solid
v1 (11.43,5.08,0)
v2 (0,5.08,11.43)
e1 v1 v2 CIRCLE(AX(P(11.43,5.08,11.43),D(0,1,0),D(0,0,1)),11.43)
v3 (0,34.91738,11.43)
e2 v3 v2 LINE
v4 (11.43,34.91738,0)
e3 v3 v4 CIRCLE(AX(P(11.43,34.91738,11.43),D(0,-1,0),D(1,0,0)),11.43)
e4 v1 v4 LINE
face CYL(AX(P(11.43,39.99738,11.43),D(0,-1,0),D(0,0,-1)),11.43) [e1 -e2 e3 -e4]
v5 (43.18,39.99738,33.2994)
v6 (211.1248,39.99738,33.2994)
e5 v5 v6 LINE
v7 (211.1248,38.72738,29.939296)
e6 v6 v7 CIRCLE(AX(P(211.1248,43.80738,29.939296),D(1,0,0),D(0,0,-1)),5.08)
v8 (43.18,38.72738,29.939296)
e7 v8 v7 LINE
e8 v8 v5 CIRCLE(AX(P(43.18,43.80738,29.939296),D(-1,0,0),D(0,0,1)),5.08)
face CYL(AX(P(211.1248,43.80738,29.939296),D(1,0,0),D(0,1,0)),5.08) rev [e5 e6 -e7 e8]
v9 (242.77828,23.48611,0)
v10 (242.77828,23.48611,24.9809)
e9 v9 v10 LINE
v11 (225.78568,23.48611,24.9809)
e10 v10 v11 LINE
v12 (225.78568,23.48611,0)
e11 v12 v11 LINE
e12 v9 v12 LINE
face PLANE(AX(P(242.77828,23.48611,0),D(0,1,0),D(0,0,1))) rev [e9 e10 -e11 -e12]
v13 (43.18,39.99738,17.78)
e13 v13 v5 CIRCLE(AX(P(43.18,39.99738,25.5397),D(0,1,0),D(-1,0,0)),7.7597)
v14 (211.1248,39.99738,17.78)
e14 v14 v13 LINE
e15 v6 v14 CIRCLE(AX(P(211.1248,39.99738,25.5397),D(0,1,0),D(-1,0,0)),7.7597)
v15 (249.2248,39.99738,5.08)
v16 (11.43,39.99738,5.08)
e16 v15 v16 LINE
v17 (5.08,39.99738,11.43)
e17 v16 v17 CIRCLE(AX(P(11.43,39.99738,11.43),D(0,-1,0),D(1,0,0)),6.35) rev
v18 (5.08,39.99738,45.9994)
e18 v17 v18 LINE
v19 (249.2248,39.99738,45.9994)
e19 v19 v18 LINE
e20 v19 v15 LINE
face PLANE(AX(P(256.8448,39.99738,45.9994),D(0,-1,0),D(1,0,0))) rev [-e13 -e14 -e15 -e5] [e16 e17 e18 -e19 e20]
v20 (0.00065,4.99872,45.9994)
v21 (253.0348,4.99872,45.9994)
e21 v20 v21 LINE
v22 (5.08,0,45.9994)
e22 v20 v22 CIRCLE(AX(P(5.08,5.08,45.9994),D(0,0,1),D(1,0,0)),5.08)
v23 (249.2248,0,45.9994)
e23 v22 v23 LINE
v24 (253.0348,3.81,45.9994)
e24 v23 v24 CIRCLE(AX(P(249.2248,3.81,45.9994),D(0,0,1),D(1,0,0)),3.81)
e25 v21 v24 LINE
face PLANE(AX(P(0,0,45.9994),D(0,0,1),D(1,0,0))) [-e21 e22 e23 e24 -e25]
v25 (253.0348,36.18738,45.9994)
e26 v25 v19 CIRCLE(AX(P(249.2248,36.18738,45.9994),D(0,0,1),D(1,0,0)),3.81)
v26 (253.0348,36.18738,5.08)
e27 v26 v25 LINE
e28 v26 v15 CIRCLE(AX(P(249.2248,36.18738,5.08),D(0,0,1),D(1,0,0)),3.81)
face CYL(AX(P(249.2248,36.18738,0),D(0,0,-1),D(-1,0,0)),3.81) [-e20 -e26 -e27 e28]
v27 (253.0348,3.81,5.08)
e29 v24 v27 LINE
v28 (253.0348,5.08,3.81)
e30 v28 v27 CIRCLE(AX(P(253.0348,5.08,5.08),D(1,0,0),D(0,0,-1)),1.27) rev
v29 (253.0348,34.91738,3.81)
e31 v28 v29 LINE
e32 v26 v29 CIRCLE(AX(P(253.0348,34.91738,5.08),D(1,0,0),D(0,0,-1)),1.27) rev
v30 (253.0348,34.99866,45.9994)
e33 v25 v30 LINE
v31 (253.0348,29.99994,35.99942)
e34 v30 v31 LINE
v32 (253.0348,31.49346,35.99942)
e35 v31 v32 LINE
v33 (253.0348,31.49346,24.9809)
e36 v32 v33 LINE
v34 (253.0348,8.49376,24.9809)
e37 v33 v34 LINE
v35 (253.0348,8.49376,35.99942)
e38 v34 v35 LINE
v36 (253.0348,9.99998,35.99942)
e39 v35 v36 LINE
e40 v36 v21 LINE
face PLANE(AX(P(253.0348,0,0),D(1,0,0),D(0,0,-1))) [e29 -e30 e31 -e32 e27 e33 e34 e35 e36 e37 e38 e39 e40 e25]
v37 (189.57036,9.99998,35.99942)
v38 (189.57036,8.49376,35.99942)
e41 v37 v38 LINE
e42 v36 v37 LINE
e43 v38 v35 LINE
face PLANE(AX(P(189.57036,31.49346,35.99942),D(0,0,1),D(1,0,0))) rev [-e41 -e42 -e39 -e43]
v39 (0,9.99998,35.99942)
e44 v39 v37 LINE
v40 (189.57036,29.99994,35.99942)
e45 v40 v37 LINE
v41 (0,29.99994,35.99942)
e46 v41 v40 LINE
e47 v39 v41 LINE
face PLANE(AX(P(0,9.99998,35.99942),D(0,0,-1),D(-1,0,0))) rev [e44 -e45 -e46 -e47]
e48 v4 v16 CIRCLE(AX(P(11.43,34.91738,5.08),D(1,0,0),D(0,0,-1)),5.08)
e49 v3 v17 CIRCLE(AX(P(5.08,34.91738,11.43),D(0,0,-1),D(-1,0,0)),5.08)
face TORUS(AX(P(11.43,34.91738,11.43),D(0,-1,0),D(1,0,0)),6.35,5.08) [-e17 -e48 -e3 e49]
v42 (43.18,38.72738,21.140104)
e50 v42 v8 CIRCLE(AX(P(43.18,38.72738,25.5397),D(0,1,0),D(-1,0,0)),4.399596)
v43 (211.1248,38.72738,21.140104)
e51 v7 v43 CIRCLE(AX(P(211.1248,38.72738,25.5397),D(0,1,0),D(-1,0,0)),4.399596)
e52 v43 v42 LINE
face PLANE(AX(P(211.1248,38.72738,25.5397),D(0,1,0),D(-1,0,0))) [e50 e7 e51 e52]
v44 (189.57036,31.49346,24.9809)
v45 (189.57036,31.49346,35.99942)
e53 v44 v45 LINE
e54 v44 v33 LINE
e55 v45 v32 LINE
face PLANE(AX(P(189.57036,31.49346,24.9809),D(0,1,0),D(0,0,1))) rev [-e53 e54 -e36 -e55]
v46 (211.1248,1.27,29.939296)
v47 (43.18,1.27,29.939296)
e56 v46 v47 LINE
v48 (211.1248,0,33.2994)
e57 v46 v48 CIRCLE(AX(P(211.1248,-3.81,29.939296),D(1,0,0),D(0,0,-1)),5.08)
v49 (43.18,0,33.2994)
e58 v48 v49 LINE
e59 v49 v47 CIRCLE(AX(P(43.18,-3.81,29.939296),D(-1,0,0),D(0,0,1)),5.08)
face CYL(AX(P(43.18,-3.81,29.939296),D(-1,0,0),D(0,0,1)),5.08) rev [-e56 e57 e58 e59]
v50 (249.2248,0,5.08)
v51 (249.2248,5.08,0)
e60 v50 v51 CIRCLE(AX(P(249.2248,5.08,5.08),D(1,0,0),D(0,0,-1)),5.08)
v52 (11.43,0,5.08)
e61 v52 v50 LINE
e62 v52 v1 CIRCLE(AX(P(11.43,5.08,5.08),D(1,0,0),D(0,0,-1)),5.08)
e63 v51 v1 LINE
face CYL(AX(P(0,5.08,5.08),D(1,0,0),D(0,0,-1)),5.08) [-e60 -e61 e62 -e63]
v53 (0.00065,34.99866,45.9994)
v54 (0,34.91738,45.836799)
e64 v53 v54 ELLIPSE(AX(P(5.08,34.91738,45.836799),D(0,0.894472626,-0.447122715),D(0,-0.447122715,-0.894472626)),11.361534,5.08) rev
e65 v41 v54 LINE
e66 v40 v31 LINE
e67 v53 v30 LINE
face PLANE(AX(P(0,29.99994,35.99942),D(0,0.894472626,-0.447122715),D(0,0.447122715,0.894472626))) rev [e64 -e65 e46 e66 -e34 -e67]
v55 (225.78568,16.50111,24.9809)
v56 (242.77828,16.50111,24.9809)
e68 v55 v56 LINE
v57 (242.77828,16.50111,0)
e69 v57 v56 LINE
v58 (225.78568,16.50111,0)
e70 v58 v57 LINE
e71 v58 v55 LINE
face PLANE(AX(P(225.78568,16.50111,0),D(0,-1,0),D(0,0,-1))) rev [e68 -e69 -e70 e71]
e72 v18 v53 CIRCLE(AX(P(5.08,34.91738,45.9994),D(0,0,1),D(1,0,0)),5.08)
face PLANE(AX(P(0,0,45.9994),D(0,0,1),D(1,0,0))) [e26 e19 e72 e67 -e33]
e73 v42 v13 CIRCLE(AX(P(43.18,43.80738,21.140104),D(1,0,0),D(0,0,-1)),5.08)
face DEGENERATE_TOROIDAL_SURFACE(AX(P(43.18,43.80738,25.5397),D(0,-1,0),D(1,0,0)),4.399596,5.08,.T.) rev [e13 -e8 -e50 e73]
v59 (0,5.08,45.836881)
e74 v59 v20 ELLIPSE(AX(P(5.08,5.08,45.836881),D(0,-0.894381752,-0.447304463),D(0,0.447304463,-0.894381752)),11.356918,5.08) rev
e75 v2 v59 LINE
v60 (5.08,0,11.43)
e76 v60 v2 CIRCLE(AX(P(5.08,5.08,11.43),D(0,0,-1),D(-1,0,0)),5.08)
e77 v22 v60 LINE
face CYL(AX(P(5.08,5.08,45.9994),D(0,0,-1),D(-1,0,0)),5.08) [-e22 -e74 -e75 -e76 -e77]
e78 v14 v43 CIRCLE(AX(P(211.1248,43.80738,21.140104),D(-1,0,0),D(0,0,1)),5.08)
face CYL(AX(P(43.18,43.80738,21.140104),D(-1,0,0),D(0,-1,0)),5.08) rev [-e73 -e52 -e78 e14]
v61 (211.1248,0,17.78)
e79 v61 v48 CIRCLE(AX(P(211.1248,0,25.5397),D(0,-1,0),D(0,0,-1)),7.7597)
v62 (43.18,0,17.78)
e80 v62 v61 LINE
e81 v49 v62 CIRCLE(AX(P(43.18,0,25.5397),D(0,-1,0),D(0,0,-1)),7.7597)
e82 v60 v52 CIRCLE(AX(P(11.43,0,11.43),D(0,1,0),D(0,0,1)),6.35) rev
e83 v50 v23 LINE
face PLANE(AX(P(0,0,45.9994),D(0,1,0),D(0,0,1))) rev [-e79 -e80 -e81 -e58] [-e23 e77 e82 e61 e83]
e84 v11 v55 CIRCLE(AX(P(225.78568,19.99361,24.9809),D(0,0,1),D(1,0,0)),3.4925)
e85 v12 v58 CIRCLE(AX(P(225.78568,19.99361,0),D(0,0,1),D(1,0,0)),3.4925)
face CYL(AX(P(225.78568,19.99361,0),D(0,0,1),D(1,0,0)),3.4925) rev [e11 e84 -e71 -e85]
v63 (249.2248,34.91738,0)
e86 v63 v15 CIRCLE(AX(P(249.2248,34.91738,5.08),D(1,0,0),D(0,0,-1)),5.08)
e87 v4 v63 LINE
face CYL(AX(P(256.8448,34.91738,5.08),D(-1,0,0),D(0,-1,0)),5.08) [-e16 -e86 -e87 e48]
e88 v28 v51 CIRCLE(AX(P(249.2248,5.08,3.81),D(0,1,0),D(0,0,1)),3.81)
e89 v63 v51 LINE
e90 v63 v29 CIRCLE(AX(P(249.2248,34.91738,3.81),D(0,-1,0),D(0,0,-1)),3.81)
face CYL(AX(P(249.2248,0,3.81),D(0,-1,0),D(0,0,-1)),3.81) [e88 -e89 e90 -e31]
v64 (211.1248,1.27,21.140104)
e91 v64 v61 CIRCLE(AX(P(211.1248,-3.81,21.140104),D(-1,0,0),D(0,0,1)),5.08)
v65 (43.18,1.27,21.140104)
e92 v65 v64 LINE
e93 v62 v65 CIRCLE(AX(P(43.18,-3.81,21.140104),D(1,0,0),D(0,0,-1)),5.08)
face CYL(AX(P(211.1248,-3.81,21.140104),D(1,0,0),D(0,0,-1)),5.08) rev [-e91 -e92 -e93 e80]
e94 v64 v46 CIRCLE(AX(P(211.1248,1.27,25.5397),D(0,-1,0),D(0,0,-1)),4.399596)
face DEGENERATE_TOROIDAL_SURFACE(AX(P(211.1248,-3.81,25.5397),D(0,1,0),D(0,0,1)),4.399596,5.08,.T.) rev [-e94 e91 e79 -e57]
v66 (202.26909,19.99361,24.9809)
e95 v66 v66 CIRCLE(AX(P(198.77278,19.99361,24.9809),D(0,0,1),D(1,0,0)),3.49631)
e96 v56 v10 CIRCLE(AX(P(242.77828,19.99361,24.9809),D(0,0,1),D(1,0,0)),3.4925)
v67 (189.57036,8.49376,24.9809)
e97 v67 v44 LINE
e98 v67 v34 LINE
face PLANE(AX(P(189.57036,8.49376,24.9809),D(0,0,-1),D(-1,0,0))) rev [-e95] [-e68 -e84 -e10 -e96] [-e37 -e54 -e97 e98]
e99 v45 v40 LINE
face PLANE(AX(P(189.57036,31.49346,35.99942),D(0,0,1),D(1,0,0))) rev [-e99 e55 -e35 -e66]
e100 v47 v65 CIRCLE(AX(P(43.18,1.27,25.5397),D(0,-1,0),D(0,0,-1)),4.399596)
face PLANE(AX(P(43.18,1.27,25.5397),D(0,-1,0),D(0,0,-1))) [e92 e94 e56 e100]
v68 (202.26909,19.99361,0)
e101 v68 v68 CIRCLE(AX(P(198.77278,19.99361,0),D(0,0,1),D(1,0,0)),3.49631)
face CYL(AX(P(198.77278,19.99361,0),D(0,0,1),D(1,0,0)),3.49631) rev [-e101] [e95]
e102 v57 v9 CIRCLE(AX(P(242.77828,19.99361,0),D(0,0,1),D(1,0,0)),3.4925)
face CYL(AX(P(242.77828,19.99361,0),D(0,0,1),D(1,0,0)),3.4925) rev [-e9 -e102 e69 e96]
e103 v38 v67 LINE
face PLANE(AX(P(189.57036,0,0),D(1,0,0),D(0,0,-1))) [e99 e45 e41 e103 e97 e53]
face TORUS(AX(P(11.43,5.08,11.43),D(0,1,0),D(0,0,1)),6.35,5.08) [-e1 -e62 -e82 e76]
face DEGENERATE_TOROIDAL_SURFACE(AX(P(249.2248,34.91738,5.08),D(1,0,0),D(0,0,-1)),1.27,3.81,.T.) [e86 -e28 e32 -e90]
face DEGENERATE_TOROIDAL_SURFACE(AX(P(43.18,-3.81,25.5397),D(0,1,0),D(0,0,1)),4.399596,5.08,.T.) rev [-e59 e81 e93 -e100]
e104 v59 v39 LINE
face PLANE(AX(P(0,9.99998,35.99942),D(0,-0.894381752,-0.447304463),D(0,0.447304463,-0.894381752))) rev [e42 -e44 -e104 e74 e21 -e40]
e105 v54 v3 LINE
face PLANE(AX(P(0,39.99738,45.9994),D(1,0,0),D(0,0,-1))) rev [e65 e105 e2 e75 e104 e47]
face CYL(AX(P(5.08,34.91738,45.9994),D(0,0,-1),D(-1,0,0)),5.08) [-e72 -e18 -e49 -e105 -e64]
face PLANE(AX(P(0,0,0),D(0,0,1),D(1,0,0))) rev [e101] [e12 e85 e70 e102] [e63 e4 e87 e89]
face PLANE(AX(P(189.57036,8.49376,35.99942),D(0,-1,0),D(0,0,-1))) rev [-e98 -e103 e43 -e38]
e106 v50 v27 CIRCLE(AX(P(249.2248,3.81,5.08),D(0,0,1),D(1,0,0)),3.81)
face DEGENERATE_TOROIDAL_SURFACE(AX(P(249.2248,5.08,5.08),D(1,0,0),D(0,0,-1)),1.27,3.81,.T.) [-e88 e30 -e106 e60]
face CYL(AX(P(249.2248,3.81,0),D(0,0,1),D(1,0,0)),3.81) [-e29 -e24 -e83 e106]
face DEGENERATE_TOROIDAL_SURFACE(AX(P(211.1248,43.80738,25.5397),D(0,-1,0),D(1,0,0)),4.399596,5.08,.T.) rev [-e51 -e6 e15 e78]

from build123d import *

# Parameters (mm, degrees)
SKETCH1_W           = 256.8448
SKETCH1_H           = 39.99738
BOSS_EXTRUDE1_DEPTH = 45.9994
CUT_EXTRUDE1_DEPTH  = 264.979140264
SKETCH3_W           = 11.01852
SKETCH3_H           = 22.9997
CUT_EXTRUDE2_DEPTH  = 67.27444
SKETCH4_R           = 3.49631
CUT_EXTRUDE3_DEPTH  = 262.138061298
CUT_EXTRUDE4_DEPTH  = 262.138061298
SKETCH6_W           = 45.9994
SKETCH6_H           = 39.99738
CUT_EXTRUDE5_DEPTH  = 3.81
FILLET1_R           = 3.81
FILLET2_R           = 11.43
FILLET3_R           = 5.08
CUT_EXTRUDE6_DEPTH  = 1.27
FILLET4_R           = 5.08
CUT_EXTRUDE7_DEPTH  = 1.27
FILLET5_R           = 5.08


with BuildPart() as part:
    # Sketch1 → Boss-Extrude1 (new body)
    with BuildSketch(Plane.XY):
        with Locations((128.4224, 19.99869)):
            Rectangle(SKETCH1_W, SKETCH1_H)
    extrude(amount=BOSS_EXTRUDE1_DEPTH)

    # Sketch2 → Cut-Extrude1 (cut, through all)
    with BuildSketch(Plane(origin=(256.8448, 0, 0), x_dir=(0, 0, -1), z_dir=(1, 0, 0))):
        Polygon((-35.99942, 9.99998), (-45.9994, 4.99872), (-45.9994, 34.99866), (-35.99942, 29.99994), align=None)
    extrude(amount=-CUT_EXTRUDE1_DEPTH, mode=Mode.SUBTRACT)

    # Sketch3 → Cut-Extrude2 (cut)
    with BuildSketch(Plane(origin=(256.8448, 0, 0), x_dir=(0, 0, -1), z_dir=(1, 0, 0))):
        with Locations((-30.49016, 19.99361)):
            Rectangle(SKETCH3_W, SKETCH3_H)
    extrude(amount=-CUT_EXTRUDE2_DEPTH, mode=Mode.SUBTRACT)

    # Sketch4 → Cut-Extrude3 (cut, through all)
    with BuildSketch(Plane.XY.offset(24.9809)):
        with Locations((198.77278, 19.99361)):
            Circle(SKETCH4_R)
    extrude(amount=-CUT_EXTRUDE3_DEPTH, mode=Mode.SUBTRACT)

    # Sketch5 → Cut-Extrude4 (cut, through all)
    with BuildSketch(Plane.XY.offset(24.9809)):
        with BuildLine():
            Line((242.77828, 23.48611), (225.78568, 23.48611))
            ThreePointArc((225.78568, 23.48611), (222.29318, 19.99361), (225.78568, 16.50111))
            Line((225.78568, 16.50111), (242.77828, 16.50111))
            ThreePointArc((242.77828, 16.50111), (246.27078, 19.99361), (242.77828, 23.48611))
        make_face()
    extrude(amount=-CUT_EXTRUDE4_DEPTH, mode=Mode.SUBTRACT)

    # Sketch6 → Cut-Extrude5 (cut)
    with BuildSketch(Plane(origin=(256.8448, 0, 0), x_dir=(0, 0, -1), z_dir=(1, 0, 0))):
        with Locations((-22.9997, 19.99869)):
            Rectangle(SKETCH6_W, SKETCH6_H)
    extrude(amount=-CUT_EXTRUDE5_DEPTH, mode=Mode.SUBTRACT)

    # Fillet1
    fillet1_edges = [part.edges().sort_by_distance(p)[0] for p in [
        (253.0348, 19.99869, 0),
        (253.0348, 0, 22.9997),
        (253.0348, 39.99738, 22.9997),
    ]]
    fillet(fillet1_edges, radius=FILLET1_R)

    # Fillet2
    fillet2_edges = [part.edges().sort_by_distance(p)[0] for p in [
        (0, 19.99869, 0),
    ]]
    fillet(fillet2_edges, radius=FILLET2_R)

    # Fillet3
    # the kernel refuses this fillet: 5.08 mm, written as the material it takes off along each edge
    with BuildSketch(Plane(origin=(253.0348, 34.91738, 5.08), x_dir=(0, 0, -1), z_dir=(0, -1, 0))) as fillet3_piece_1:
        with BuildLine():
            CenterArc((1.27, -3.81), 3.81, 0, 90)
            Line((5.08, -3.81), (5.08, 0))
            Line((5.08, 0), (1.27, 0))
        make_face()
    revolve(axis=Axis((253.0348, 34.91738, 5.08), (1, 0, 0)), revolution_arc=90, mode=Mode.SUBTRACT)
    with BuildSketch(Plane(origin=(253.0348, 5.08, 5.08), x_dir=(0, -1, 0), z_dir=(0, 0, 1))) as fillet3_piece_2:
        with BuildLine():
            CenterArc((1.27, -3.81), 3.81, 0, 90)
            Line((5.08, -3.81), (5.08, 0))
            Line((5.08, 0), (1.27, 0))
        make_face()
    revolve(axis=Axis((253.0348, 5.08, 5.08), (1, 0, 0)), revolution_arc=90, mode=Mode.SUBTRACT)
    with BuildSketch(Plane(origin=(0, 0, 11.43), x_dir=(1, 0, 0), z_dir=(0, 0, 1)), Plane(origin=(0, 39.99738, 11.43), x_dir=(0, -1, 0), z_dir=(0, 0, 1))) as fillet3_piece_3:
        with BuildLine():
            CenterArc((FILLET3_R, FILLET3_R), FILLET3_R, 180, 90)
            Line((0, FILLET3_R), (0, 0))
            Line((0, 0), (FILLET3_R, 0))
        make_face()
    extrude(amount=47.2694, mode=Mode.SUBTRACT)
    with BuildSketch(Plane(origin=(11.43, 0, 11.43), x_dir=(0, 0, -1), z_dir=(1, 0, 0))) as fillet3_piece_4:
        with BuildLine():
            CenterArc((11.43 - FILLET3_R, FILLET3_R), FILLET3_R, 270, 90)
            Line((11.43, FILLET3_R), (11.43, 0))
            Line((11.43, 0), (11.43 - FILLET3_R, 0))
        make_face()
    revolve(axis=Axis((11.43, 0, 11.43), (0, 1, 0)), revolution_arc=90, mode=Mode.SUBTRACT)
    with BuildSketch(Plane(origin=(11.43, 39.99738, 11.43), x_dir=(0, 0, -1), z_dir=(1, 0, 0))) as fillet3_piece_5:
        with BuildLine():
            CenterArc((11.43 - FILLET3_R, -FILLET3_R), FILLET3_R, 0, 90)
            Line((11.43 - FILLET3_R, 0), (11.43, 0))
            Line((11.43, 0), (11.43, -FILLET3_R))
        make_face()
    revolve(axis=Axis((11.43, 39.99738, 11.43), (0, 1, 0)), revolution_arc=90, mode=Mode.SUBTRACT)
    with BuildSketch(Plane(origin=(11.43, 0, 0), x_dir=(0, 0, 1), z_dir=(1, 0, 0))) as fillet3_piece_6:
        with BuildLine():
            CenterArc((FILLET3_R, -FILLET3_R), FILLET3_R, 90, 90)
            Line((0, -FILLET3_R), (0, 0))
            Line((0, 0), (FILLET3_R, 0))
        make_face()
    extrude(amount=241.6048, mode=Mode.SUBTRACT)
    with BuildSketch(Plane(origin=(253.0348, 39.99738, 0), x_dir=(0, -1, 0), z_dir=(-1, 0, 0))) as fillet3_piece_7:
        with BuildLine():
            CenterArc((FILLET3_R, FILLET3_R), FILLET3_R, 180, 90)
            Line((0, FILLET3_R), (0, 0))
            Line((0, 0), (FILLET3_R, 0))
        make_face()
    extrude(amount=241.6048, mode=Mode.SUBTRACT)

    # Sketch7 → Cut-Extrude6 (cut)
    with BuildSketch(Plane(origin=(0, 39.99738, 0), x_dir=(1, 0, 0), z_dir=(0, 1, 0))):
        with BuildLine():
            Line((211.1248, -33.2994), (43.18, -33.2994))
            ThreePointArc((43.18, -33.2994), (35.4203, -25.5397), (43.18, -17.78))
            Line((43.18, -17.78), (211.1248, -17.78))
            ThreePointArc((211.1248, -17.78), (218.8845, -25.5397), (211.1248, -33.2994))
        make_face()
    extrude(amount=-CUT_EXTRUDE6_DEPTH, mode=Mode.SUBTRACT)

    # Fillet4
    # the kernel refuses this fillet: 5.08 mm, written as the material it adds along each edge
    with BuildSketch(Plane(origin=(211.1248, 38.72738, 33.2994), x_dir=(0, 1, 0), z_dir=(-1, 0, 0)), Plane(origin=(43.18, 38.72738, 17.78), x_dir=(0, 1, 0), z_dir=(1, 0, 0))) as fillet4_piece_1:
        with BuildLine():
            CenterArc((5.08, 3.360104165), FILLET4_R, 180, 41.409622109)
            Line((0, 3.360104165), (-0.1016, 3.360104165))
            Line((-0.1016, 3.360104165), (-0.1016, 0))
            Line((-0.1016, 0), (0, -0.1016))
            ThreePointArc((0, -0.1016), (0.635, -0.1016), (1.1938, -0.067202083))
            Line((1.1938, -0.067202083), (1.27, 0))
        make_face()
    extrude(amount=167.9448)
    with BuildSketch(Plane(origin=(43.18, 38.72738, 25.5397), x_dir=(0, 0, 1), z_dir=(1, 0, 0))) as fillet4_piece_2:
        with BuildLine():
            CenterArc((4.399595835, -5.08), FILLET4_R, 48.590377891, 41.409622109)
            Line((4.399595835, 0), (4.399595835, 0.1016))
            Line((4.399595835, 0.1016), (7.7597, 0.1016))
            Line((7.7597, 0.1016), (7.8613, 0))
            ThreePointArc((7.8613, 0), (7.8613, -0.635), (7.826902083, -1.1938))
            Line((7.826902083, -1.1938), (7.7597, -1.27))
        make_face()
    revolve(axis=Axis((43.18, 38.72738, 25.5397), (0, -1, 0)), revolution_arc=180)
    with BuildSketch(Plane(origin=(211.1248, 38.72738, 25.5397), x_dir=(0, 0, -1), z_dir=(-1, 0, 0))) as fillet4_piece_3:
        with BuildLine():
            CenterArc((4.399595835, -5.08), FILLET4_R, 48.590377891, 41.409622109)
            Line((4.399595835, 0), (4.399595835, 0.1016))
            Line((4.399595835, 0.1016), (7.7597, 0.1016))
            Line((7.7597, 0.1016), (7.8613, 0))
            ThreePointArc((7.8613, 0), (7.8613, -0.635), (7.826902083, -1.1938))
            Line((7.826902083, -1.1938), (7.7597, -1.27))
        make_face()
    revolve(axis=Axis((211.1248, 38.72738, 25.5397), (0, -1, 0)), revolution_arc=180)

    # Sketch8 → Cut-Extrude7 (cut)
    with BuildSketch(Plane.XZ):
        with BuildLine():
            Line((43.18, 33.2994), (211.1248, 33.2994))
            ThreePointArc((211.1248, 33.2994), (218.8845, 25.5397), (211.1248, 17.78))
            Line((211.1248, 17.78), (43.18, 17.78))
            ThreePointArc((43.18, 17.78), (35.4203, 25.5397), (43.18, 33.2994))
        make_face()
    extrude(amount=-CUT_EXTRUDE7_DEPTH, mode=Mode.SUBTRACT)

    # Fillet5
    # the kernel refuses this fillet: 5.08 mm, written as the material it adds along each edge
    with BuildSketch(Plane(origin=(43.18, 1.27, 33.2994), x_dir=(0, -1, 0), z_dir=(1, 0, 0)), Plane(origin=(211.1248, 1.27, 17.78), x_dir=(0, -1, 0), z_dir=(-1, 0, 0))) as fillet5_piece_1:
        with BuildLine():
            CenterArc((5.08, 3.360104165), FILLET5_R, 180, 41.409622109)
            Line((0, 3.360104165), (-0.1016, 3.360104165))
            Line((-0.1016, 3.360104165), (-0.1016, 0))
            Line((-0.1016, 0), (0, -0.1016))
            ThreePointArc((0, -0.1016), (0.635, -0.1016), (1.1938, -0.067202083))
            Line((1.1938, -0.067202083), (1.27, 0))
        make_face()
    extrude(amount=167.9448)
    with BuildSketch(Plane(origin=(211.1248, 1.27, 25.5397), x_dir=(0, 0, 1), z_dir=(-1, 0, 0))) as fillet5_piece_2:
        with BuildLine():
            CenterArc((4.399595835, -5.08), FILLET5_R, 48.590377891, 41.409622109)
            Line((4.399595835, 0), (4.399595835, 0.1016))
            Line((4.399595835, 0.1016), (7.7597, 0.1016))
            Line((7.7597, 0.1016), (7.8613, 0))
            ThreePointArc((7.8613, 0), (7.8613, -0.635), (7.826902083, -1.1938))
            Line((7.826902083, -1.1938), (7.7597, -1.27))
        make_face()
    revolve(axis=Axis((211.1248, 1.27, 25.5397), (0, 1, 0)), revolution_arc=180)
    with BuildSketch(Plane(origin=(43.18, 1.27, 25.5397), x_dir=(0, 0, -1), z_dir=(1, 0, 0))) as fillet5_piece_3:
        with BuildLine():
            CenterArc((4.399595835, -5.08), FILLET5_R, 48.590377891, 41.409622109)
            Line((4.399595835, 0), (4.399595835, 0.1016))
            Line((4.399595835, 0.1016), (7.7597, 0.1016))
            Line((7.7597, 0.1016), (7.8613, 0))
            ThreePointArc((7.8613, 0), (7.8613, -0.635), (7.826902083, -1.1938))
            Line((7.826902083, -1.1938), (7.7597, -1.27))
        make_face()
    revolve(axis=Axis((43.18, 1.27, 25.5397), (0, 1, 0)), revolution_arc=180)


solid = part.part
